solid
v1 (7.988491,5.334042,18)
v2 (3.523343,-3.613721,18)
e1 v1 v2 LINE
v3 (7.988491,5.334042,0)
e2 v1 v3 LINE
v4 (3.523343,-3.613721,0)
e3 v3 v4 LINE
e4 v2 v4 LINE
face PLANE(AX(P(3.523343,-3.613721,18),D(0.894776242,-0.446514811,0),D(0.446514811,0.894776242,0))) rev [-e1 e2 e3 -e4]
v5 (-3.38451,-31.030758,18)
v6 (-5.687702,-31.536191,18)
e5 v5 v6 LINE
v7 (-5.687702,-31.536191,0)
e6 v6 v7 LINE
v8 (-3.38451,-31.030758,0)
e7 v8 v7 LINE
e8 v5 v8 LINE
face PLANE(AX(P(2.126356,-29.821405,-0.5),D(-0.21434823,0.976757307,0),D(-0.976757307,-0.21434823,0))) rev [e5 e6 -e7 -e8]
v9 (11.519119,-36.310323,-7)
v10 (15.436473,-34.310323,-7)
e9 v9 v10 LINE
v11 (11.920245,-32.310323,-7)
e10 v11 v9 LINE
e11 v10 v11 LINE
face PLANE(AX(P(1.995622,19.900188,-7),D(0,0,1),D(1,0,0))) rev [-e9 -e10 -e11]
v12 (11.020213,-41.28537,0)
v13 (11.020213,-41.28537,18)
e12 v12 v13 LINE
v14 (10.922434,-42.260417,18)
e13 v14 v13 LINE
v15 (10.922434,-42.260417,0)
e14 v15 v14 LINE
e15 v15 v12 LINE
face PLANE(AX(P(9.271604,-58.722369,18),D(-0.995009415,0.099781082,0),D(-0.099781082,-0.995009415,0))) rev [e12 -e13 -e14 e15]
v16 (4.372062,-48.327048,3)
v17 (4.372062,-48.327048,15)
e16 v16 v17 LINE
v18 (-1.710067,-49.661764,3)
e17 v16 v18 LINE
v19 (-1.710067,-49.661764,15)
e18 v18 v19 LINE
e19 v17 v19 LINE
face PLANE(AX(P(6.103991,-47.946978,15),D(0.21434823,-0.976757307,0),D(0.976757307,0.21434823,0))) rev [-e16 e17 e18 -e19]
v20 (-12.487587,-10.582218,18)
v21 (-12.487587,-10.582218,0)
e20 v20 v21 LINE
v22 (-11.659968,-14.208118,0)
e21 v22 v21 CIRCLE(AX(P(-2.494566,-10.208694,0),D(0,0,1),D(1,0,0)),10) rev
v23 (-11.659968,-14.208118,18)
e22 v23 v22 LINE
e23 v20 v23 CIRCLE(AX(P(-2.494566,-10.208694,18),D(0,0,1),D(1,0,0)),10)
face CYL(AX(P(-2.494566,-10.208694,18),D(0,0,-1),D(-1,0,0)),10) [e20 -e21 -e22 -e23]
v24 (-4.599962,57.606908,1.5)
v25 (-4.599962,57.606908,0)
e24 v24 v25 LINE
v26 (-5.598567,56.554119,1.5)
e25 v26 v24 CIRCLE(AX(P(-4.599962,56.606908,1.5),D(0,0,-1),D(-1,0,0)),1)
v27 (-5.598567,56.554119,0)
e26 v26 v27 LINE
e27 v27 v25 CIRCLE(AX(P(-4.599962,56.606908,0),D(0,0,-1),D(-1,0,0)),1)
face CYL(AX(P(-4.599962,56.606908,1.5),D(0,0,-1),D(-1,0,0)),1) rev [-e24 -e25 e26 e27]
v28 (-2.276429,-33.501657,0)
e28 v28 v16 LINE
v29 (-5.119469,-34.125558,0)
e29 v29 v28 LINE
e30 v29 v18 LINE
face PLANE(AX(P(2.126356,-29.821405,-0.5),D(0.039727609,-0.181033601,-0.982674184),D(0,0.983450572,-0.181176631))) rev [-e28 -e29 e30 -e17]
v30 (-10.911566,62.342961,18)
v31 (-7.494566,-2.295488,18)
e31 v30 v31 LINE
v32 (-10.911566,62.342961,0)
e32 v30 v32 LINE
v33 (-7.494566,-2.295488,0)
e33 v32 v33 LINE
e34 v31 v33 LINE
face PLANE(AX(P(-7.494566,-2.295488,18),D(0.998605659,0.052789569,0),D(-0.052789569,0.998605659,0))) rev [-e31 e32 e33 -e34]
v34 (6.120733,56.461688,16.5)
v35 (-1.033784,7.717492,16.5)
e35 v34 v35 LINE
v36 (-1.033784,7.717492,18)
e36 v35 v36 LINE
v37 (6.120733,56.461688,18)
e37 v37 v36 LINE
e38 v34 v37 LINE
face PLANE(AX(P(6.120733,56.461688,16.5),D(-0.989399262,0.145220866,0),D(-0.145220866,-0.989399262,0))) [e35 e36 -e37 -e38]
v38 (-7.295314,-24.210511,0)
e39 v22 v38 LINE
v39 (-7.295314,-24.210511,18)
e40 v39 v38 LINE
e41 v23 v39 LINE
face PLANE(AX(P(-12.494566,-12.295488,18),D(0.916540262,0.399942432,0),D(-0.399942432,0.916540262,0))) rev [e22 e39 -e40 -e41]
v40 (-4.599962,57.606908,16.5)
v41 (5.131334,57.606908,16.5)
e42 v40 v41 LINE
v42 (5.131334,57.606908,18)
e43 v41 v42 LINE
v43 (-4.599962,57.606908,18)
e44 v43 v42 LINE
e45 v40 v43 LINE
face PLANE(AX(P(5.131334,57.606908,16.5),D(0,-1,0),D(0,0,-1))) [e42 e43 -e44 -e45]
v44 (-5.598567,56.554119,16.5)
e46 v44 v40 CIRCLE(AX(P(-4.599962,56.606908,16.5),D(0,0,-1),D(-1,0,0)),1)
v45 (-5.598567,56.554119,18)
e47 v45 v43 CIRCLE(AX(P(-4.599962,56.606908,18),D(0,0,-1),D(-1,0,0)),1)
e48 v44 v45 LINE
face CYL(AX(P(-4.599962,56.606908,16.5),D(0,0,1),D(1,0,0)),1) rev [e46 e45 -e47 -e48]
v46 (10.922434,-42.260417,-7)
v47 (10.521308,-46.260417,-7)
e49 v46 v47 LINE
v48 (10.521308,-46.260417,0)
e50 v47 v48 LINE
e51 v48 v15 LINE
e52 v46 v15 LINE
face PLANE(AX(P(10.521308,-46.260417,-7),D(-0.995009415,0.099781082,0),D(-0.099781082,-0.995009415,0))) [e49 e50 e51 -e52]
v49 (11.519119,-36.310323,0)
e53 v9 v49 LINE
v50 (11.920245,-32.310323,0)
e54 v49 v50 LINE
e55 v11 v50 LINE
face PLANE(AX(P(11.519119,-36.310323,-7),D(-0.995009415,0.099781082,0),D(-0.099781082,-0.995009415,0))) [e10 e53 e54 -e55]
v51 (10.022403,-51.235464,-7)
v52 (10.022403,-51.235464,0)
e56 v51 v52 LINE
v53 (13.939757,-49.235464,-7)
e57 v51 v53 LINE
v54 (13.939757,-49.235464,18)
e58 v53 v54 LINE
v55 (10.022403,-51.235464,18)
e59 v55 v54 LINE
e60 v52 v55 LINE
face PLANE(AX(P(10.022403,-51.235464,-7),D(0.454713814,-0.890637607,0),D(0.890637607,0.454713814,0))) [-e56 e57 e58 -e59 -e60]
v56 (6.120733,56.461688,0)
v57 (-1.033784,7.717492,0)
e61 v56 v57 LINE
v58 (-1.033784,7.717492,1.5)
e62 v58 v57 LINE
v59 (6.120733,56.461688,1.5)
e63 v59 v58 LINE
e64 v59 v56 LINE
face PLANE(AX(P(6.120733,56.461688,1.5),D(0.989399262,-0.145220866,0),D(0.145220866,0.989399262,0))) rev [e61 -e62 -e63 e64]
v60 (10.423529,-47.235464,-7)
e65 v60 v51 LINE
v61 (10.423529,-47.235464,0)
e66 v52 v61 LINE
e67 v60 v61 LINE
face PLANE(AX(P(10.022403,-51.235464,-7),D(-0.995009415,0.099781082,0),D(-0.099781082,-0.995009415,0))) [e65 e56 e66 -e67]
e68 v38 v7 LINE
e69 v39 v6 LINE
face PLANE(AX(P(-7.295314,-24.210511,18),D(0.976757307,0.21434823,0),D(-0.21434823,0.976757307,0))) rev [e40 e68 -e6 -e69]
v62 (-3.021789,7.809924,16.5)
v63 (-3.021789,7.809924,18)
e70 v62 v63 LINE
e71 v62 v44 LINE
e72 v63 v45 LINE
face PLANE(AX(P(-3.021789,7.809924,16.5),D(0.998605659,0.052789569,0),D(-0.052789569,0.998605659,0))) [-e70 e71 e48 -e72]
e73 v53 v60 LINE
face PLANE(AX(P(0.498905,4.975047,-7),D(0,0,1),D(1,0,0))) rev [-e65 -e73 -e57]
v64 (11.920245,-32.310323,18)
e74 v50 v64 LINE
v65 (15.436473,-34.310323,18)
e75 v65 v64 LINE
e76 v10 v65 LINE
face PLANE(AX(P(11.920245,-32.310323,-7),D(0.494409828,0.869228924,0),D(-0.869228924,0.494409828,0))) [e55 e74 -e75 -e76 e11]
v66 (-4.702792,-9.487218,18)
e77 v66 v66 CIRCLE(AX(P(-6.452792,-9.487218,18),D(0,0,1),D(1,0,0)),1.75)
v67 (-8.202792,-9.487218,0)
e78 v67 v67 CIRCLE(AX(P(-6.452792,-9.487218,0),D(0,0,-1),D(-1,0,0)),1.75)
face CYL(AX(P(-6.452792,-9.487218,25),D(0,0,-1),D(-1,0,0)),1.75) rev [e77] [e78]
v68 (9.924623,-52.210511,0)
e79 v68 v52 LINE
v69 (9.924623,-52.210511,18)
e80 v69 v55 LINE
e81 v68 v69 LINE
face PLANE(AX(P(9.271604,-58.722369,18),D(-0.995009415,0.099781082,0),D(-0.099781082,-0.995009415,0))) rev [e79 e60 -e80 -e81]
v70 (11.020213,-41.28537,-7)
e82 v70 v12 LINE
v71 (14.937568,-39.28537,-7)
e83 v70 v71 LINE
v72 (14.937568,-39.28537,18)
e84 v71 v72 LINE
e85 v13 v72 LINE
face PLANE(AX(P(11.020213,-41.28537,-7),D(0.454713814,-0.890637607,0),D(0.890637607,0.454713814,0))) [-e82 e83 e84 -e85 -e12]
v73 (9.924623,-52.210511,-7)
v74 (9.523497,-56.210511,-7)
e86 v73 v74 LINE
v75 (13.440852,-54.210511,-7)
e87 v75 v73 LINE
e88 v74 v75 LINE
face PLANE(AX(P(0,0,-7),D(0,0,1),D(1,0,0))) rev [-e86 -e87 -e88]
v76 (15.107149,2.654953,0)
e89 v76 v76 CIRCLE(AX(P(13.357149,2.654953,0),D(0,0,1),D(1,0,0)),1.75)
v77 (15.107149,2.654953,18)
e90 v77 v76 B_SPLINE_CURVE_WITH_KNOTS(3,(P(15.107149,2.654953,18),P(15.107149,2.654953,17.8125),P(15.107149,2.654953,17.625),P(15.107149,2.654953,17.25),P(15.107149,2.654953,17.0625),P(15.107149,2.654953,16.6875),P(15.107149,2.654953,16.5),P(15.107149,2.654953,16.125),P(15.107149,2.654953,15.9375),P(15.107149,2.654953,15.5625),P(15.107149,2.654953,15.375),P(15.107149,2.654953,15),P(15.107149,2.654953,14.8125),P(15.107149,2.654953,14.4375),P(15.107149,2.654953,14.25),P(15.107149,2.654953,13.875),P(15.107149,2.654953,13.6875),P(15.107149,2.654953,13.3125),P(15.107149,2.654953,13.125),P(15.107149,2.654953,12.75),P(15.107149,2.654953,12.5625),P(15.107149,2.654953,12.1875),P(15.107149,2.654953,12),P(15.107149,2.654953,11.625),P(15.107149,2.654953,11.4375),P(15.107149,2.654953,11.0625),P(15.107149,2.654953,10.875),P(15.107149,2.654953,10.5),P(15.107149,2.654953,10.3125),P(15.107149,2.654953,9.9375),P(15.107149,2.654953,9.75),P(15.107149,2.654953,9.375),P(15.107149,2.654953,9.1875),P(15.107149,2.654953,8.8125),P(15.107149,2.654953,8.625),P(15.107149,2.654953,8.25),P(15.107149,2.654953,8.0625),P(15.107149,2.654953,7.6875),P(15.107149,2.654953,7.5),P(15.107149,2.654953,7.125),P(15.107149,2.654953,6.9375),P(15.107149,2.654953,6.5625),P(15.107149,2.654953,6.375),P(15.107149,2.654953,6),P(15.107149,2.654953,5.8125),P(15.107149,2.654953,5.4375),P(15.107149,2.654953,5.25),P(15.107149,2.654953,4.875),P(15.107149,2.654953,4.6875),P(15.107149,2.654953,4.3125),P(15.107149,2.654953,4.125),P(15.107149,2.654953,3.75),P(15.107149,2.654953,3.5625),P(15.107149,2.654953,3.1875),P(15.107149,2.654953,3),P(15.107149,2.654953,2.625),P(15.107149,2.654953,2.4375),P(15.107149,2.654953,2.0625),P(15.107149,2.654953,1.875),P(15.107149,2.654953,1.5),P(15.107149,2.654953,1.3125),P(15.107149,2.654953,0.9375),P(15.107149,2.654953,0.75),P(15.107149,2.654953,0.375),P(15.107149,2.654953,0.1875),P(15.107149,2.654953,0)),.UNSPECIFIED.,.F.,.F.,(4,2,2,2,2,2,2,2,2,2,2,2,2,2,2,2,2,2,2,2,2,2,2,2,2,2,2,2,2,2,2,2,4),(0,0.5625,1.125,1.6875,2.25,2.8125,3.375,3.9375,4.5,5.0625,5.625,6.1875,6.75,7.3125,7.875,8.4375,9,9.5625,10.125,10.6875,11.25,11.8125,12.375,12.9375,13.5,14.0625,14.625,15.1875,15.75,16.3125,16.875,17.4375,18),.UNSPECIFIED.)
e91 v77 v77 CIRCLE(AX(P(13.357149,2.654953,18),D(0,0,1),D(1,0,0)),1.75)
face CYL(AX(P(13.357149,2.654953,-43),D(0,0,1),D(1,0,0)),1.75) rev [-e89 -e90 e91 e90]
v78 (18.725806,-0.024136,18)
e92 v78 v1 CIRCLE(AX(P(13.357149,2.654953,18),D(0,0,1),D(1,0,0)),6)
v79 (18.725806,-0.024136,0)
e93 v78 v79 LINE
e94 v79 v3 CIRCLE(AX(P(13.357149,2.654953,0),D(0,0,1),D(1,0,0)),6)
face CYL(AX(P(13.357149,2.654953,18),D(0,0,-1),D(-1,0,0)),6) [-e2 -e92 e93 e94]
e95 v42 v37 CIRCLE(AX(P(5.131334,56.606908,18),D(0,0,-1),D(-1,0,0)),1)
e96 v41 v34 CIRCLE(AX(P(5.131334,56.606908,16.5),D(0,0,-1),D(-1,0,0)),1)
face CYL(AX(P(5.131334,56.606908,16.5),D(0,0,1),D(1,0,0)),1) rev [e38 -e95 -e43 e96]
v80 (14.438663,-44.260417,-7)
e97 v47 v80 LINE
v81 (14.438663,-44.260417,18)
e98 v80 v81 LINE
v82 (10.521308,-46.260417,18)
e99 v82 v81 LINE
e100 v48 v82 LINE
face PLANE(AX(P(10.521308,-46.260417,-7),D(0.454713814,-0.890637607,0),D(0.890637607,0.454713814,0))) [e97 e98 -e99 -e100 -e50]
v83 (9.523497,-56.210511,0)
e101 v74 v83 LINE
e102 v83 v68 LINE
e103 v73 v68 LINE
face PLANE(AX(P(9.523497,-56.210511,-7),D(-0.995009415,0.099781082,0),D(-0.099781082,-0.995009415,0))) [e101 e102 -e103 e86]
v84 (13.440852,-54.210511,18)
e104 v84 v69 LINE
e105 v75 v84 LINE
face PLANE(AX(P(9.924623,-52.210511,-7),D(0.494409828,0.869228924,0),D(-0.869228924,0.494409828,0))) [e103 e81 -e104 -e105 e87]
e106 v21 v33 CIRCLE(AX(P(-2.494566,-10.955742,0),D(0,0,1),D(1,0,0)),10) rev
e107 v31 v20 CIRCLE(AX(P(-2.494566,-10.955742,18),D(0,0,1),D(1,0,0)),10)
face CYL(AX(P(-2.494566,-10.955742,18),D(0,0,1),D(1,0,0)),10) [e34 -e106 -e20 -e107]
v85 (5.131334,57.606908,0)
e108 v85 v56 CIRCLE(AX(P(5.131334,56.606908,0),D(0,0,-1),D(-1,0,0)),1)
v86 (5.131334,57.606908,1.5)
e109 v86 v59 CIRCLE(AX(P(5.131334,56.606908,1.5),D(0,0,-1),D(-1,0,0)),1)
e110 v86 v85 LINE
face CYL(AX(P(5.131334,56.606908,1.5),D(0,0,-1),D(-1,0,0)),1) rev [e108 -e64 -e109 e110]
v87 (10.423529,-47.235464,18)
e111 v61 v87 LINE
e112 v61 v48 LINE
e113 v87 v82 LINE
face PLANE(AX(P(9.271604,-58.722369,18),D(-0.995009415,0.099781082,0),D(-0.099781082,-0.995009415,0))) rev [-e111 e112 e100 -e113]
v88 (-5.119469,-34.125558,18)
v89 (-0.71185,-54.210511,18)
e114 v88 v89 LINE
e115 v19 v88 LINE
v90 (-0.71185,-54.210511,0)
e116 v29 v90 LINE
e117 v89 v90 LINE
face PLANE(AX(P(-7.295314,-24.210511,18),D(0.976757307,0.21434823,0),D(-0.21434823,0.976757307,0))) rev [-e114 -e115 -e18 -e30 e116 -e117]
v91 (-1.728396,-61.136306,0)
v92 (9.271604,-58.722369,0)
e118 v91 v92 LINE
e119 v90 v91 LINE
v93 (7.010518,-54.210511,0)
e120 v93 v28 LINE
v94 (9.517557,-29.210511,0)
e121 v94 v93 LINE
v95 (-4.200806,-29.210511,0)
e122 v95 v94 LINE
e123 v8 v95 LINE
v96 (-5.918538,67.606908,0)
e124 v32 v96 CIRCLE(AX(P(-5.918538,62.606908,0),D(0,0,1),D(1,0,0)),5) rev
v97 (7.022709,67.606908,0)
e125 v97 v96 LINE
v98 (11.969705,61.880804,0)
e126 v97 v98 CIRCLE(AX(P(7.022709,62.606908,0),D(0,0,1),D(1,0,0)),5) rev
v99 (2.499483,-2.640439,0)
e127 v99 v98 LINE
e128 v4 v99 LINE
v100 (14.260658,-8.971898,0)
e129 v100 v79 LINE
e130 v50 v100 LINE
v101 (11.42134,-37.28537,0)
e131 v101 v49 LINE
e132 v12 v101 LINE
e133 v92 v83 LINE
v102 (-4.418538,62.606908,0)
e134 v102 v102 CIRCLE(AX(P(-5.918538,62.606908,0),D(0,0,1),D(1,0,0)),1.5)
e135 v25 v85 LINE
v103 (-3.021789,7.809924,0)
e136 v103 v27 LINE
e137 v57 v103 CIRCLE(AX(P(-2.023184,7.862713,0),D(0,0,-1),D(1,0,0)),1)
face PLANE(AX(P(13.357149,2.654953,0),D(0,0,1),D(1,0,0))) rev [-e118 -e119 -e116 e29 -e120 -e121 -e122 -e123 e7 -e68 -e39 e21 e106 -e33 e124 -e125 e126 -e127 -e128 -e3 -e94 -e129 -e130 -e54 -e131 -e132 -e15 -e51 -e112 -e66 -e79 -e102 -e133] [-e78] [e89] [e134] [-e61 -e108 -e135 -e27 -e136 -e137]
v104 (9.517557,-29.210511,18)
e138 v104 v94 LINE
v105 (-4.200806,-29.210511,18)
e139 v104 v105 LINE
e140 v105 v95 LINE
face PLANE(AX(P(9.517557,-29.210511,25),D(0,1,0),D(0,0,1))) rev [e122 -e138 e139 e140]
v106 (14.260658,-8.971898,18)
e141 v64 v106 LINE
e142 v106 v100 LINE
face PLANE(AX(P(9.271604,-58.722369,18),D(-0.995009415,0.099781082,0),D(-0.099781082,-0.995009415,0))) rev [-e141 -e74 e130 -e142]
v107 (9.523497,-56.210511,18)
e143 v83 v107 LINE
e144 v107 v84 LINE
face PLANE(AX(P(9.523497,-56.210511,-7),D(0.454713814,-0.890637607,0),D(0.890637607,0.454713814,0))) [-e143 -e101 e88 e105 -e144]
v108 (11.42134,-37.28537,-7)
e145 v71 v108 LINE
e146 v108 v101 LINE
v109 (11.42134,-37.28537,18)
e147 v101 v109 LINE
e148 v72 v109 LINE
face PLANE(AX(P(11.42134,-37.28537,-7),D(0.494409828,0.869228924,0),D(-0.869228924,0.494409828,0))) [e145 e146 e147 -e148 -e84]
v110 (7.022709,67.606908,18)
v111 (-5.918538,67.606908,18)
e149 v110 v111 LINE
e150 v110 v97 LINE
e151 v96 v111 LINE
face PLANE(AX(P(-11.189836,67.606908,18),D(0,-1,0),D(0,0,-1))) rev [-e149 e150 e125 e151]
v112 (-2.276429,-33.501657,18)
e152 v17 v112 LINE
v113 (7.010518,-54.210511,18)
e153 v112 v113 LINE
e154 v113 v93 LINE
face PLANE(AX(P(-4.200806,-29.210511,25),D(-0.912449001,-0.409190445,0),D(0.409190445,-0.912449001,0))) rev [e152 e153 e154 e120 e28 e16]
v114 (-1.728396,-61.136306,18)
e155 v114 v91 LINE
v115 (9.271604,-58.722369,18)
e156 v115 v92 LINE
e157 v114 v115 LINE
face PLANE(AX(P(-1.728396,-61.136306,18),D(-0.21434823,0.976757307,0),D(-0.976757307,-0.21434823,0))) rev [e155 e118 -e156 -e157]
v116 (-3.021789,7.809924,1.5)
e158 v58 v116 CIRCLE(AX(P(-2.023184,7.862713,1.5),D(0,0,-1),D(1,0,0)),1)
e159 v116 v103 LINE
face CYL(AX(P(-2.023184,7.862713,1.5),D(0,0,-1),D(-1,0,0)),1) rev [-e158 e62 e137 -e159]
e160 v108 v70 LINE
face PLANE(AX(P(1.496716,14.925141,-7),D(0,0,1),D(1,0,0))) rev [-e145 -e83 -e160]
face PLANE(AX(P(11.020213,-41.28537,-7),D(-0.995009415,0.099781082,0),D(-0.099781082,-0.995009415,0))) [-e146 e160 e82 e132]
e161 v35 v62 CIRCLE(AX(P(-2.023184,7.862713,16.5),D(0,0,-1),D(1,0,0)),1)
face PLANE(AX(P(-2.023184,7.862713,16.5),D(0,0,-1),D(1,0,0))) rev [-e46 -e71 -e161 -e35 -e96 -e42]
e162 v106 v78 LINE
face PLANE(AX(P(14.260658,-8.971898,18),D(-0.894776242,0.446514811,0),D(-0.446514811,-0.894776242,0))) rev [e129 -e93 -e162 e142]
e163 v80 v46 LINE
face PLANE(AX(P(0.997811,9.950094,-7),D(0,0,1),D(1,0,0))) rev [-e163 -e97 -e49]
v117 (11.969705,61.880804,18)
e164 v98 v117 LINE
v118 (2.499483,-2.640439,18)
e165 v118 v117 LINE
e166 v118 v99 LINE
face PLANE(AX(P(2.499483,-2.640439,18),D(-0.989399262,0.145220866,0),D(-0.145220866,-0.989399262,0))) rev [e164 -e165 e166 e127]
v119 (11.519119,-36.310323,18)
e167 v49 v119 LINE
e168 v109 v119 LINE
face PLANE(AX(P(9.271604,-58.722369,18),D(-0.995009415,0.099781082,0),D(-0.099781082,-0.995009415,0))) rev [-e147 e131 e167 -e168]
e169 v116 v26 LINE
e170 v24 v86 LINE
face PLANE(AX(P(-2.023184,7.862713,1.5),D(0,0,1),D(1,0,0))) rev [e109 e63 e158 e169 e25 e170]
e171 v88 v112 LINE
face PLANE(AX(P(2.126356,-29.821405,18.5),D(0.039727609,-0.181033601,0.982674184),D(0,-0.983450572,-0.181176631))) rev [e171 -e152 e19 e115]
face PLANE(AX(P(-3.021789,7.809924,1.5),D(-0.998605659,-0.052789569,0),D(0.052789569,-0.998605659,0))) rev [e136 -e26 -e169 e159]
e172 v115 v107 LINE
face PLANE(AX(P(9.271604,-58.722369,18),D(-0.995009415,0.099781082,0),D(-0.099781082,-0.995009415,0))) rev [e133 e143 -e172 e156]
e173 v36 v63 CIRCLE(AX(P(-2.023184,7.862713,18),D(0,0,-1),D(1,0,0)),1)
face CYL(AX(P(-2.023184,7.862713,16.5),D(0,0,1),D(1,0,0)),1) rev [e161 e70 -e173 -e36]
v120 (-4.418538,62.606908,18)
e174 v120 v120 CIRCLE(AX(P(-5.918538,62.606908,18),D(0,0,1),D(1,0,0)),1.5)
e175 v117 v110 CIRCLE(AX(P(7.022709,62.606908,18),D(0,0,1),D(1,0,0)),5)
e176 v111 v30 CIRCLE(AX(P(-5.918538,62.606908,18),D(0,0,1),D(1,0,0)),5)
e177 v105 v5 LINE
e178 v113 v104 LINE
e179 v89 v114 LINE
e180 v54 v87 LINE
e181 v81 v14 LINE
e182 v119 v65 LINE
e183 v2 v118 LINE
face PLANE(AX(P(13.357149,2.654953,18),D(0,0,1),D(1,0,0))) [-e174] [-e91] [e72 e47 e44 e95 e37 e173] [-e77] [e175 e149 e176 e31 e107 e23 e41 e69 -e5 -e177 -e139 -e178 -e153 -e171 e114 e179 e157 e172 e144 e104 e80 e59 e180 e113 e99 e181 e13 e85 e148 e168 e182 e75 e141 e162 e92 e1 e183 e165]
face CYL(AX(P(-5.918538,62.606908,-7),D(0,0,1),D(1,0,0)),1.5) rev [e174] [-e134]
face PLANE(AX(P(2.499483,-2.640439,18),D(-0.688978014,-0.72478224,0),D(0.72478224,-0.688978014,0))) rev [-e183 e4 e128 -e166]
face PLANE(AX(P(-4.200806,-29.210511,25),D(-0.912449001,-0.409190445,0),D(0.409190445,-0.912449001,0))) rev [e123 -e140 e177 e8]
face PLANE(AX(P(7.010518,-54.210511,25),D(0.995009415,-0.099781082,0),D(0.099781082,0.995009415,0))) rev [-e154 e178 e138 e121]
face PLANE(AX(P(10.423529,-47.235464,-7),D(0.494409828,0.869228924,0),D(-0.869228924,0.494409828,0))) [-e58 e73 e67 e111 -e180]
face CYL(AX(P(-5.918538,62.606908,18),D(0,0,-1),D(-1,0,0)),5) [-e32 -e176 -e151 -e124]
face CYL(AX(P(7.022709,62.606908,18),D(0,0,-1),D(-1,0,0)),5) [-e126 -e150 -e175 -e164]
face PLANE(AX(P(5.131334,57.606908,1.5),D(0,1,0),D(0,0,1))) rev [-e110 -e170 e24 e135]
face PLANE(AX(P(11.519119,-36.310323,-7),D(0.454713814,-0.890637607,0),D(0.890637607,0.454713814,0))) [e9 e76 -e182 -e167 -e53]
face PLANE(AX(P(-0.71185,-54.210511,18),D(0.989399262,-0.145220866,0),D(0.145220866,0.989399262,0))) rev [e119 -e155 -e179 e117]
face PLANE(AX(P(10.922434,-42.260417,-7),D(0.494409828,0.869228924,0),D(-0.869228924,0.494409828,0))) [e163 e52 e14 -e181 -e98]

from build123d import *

# Parameters (mm, degrees)
BOSS_EXTRUDE1_DEPTH = 18
CUT_EXTRUDE1_DEPTH  = 25
BOSS_EXTRUDE2_DEPTH = 25
LPATTERN1_COUNT     = 5
LPATTERN1_PITCH     = 5
FILLET1_R           = 10
FILLET2_R           = 5
SKETCH6_R           = 1.5
CUT_EXTRUDE2_DEPTH  = 25
CUT_EXTRUDE3_DEPTH  = 8
SKETCH8_R           = 1.75
CUT_EXTRUDE4_DEPTH  = 61
SKETCH9_R           = 1.75
CUT_EXTRUDE5_DEPTH  = 25
CUT_EXTRUDE6_DEPTH  = 1.5


with BuildPart() as part:
    # Sketch1 → Boss-Extrude1 (new body)
    with BuildSketch(Plane.XY):
        with BuildLine():
            Line((2.499482963, -2.64043917), (12.810164454, 67.606908446))
            Line((12.810164454, 67.606908446), (-11.189835546, 67.606908446))
            Line((-11.189835546, 67.606908446), (-7.494565689, -2.295487655))
            Line((-7.494565689, -2.295487655), (-12.494565689, -2.295487655))
            Line((-12.494565689, -2.295487655), (-12.494565689, -12.295487655))
            Line((-12.494565689, -12.295487655), (-7.295314078, -24.210511057))
            Line((-7.295314078, -24.210511057), (-0.711849738, -54.210511057))
            Line((-0.711849738, -54.210511057), (-1.728395801, -61.136305893))
            Line((-1.728395801, -61.136305893), (9.271604199, -58.722368968))
            Line((9.271604199, -58.722368968), (14.26065829, -8.971898224))
            Line((14.26065829, -8.971898224), (18.725806397, -0.0241358))
            ThreePointArc((18.725806397, -0.0241358), (16.036237527, 8.023610308), (7.988491349, 5.334041648))
            Line((7.988491349, 5.334041648), (3.523343243, -3.613720776))
            Line((3.523343243, -3.613720776), (2.499482963, -2.64043917))
        make_face()
    extrude(amount=BOSS_EXTRUDE1_DEPTH)

    # Sketch4 → Cut-Extrude1 (cut)
    with BuildSketch(Plane(origin=(0, 0, 0), x_dir=(-1, 0, 0), z_dir=(0, 0, -1))):
        Polygon((-7.01051812, -54.210511057), (-9.517556755, -29.210511057), (4.20080561, -29.210511057), align=None)
    extrude(amount=-CUT_EXTRUDE1_DEPTH, mode=Mode.SUBTRACT)

    # Sketch5 → Boss-Extrude2 (add)
    with BuildSketch(Plane.XY.offset(18)):
        Polygon((9.523497192, -56.210511057), (9.924623374, -52.210511057), (13.440851715, -54.210511057), align=None)
    boss_extrude2 = extrude(amount=-BOSS_EXTRUDE2_DEPTH)

    # LPattern1: Boss-Extrude2 ×5
    with Locations(*[Vector(0.09978108182512832, 0.9950094148850086, 0) * (i * LPATTERN1_PITCH) for i in range(1, LPATTERN1_COUNT)]):
        add(boss_extrude2)

    # Fillet1
    # the kernel refuses this fillet: 10 mm, written as the material it takes off along each edge
    with BuildSketch(Plane(origin=(-12.494565689, -12.295487655, -5.216984474), x_dir=(0, 1, 0), z_dir=(0, 0, 1))) as fillet1_piece_1:
        with BuildLine():
            CenterArc((FILLET1_R * 0.208679378975, -FILLET1_R), FILLET1_R, 90, 23.574579649)
            Line((-FILLET1_R * 0.191263052627, -FILLET1_R * 0.0834597382526), (-FILLET1_R * 0.199261901259, -FILLET1_R * 0.0651289330176))
            Line((-FILLET1_R * 0.199261901259, -FILLET1_R * 0.0651289330176), (-FILLET1_R * 0.0041735875795, FILLET1_R * 0.02))
            Line((-FILLET1_R * 0.0041735875795, FILLET1_R * 0.02), (FILLET1_R * 0.208679378975, FILLET1_R * 0.02))
            Line((FILLET1_R * 0.208679378975, FILLET1_R * 0.02), (FILLET1_R * 0.208679378975, 0))
        make_face()
    extrude(amount=28.433968949, mode=Mode.SUBTRACT)
    with BuildSketch(Plane(origin=(-12.494565689, -2.295487655, -21.650635095), x_dir=(1, 0, 0), z_dir=(0, 0, 1))) as fillet1_piece_2:
        with BuildLine():
            CenterArc((10, -8.660254038), FILLET1_R, 120, 60)
            Line((0, -8.660254038), (-0.2, -8.660254038))
            Line((-0.2, -8.660254038), (-0.2, 0))
            Line((-0.2, 0), (0, 0.2))
            ThreePointArc((0, 0.2), (2.5, 0.2), (4.9, 0.173205081))
            Line((4.9, 0.173205081), (5, 0))
        make_face()
    extrude(amount=61.301270189, mode=Mode.SUBTRACT)

    # Fillet2
    fillet2_edges = [part.edges().sort_by_distance(p)[0] for p in [
        (-11.189835546, 67.606908446, 9),
        (12.810164454, 67.606908446, 9),
    ]]
    fillet(fillet2_edges, radius=FILLET2_R)

    # Sketch6 → Cut-Extrude2 (cut)
    with BuildSketch(Plane.XY.offset(18)):
        with Locations((-5.91853771, 62.606908446)):
            Circle(SKETCH6_R)
    extrude(amount=-CUT_EXTRUDE2_DEPTH, mode=Mode.SUBTRACT)

    # Sketch7 → Cut-Extrude3 (cut)
    with BuildSketch(Plane(origin=(-12.028992373, -2.639748078, 0), x_dir=(0, 0, 1), z_dir=(-0.9767573067708646, -0.21434822991974342, 0))):
        Polygon((-0.5, -29.584055917), (18.5, -29.584055917), (15, -48.14094063), (3, -48.14094063), align=None)
    extrude(amount=-CUT_EXTRUDE3_DEPTH, mode=Mode.SUBTRACT)

    # Sketch8 → Cut-Extrude4 (cut)
    with BuildSketch(Plane.XY.offset(18)):
        with Locations((13.357148803, 2.654952784)):
            Circle(SKETCH8_R)
    extrude(amount=-CUT_EXTRUDE4_DEPTH, mode=Mode.SUBTRACT)

    # Sketch9 → Cut-Extrude5 (cut)
    with BuildSketch(Plane(origin=(0, 0, 0), x_dir=(-1, 0, 0), z_dir=(0, 0, -1))):
        with Locations((6.452791989, -9.487217743)):
            Circle(SKETCH9_R)
    extrude(amount=-CUT_EXTRUDE5_DEPTH, mode=Mode.SUBTRACT)

    # Sketch10 → Cut-Extrude6 (cut)
    with BuildSketch(Plane(origin=(0, 0, 0), x_dir=(-1, 0, 0), z_dir=(0, 0, -1))):
        with BuildLine():
            Line((-5.131333655, 57.606908446), (4.599961749, 57.606908446))
            ThreePointArc((4.599961749, 57.606908446), (5.325492441, 57.295098257), (5.598567407, 56.554118877))
            Line((5.598567407, 56.554118877), (3.02178942, 7.809923601))
            ThreePointArc((3.02178942, 7.809923601), (2.069628089, 6.863792291), (1.033784499, 7.717492305))
            Line((1.033784499, 7.717492305), (-6.120732918, 56.46168758))
            ThreePointArc((-6.120732918, 56.46168758), (-5.888043926, 57.260658832), (-5.131333655, 57.606908446))
        make_face()
    cut_extrude6 = extrude(amount=-CUT_EXTRUDE6_DEPTH, mode=Mode.SUBTRACT)

    # Mirror1: Cut-Extrude6 across plane
    add(cut_extrude6.mirror(Plane(origin=(0, 0, 9), x_dir=(1, 0, 0), z_dir=(0, 0, -1))), mode=Mode.SUBTRACT)


solid = part.part
